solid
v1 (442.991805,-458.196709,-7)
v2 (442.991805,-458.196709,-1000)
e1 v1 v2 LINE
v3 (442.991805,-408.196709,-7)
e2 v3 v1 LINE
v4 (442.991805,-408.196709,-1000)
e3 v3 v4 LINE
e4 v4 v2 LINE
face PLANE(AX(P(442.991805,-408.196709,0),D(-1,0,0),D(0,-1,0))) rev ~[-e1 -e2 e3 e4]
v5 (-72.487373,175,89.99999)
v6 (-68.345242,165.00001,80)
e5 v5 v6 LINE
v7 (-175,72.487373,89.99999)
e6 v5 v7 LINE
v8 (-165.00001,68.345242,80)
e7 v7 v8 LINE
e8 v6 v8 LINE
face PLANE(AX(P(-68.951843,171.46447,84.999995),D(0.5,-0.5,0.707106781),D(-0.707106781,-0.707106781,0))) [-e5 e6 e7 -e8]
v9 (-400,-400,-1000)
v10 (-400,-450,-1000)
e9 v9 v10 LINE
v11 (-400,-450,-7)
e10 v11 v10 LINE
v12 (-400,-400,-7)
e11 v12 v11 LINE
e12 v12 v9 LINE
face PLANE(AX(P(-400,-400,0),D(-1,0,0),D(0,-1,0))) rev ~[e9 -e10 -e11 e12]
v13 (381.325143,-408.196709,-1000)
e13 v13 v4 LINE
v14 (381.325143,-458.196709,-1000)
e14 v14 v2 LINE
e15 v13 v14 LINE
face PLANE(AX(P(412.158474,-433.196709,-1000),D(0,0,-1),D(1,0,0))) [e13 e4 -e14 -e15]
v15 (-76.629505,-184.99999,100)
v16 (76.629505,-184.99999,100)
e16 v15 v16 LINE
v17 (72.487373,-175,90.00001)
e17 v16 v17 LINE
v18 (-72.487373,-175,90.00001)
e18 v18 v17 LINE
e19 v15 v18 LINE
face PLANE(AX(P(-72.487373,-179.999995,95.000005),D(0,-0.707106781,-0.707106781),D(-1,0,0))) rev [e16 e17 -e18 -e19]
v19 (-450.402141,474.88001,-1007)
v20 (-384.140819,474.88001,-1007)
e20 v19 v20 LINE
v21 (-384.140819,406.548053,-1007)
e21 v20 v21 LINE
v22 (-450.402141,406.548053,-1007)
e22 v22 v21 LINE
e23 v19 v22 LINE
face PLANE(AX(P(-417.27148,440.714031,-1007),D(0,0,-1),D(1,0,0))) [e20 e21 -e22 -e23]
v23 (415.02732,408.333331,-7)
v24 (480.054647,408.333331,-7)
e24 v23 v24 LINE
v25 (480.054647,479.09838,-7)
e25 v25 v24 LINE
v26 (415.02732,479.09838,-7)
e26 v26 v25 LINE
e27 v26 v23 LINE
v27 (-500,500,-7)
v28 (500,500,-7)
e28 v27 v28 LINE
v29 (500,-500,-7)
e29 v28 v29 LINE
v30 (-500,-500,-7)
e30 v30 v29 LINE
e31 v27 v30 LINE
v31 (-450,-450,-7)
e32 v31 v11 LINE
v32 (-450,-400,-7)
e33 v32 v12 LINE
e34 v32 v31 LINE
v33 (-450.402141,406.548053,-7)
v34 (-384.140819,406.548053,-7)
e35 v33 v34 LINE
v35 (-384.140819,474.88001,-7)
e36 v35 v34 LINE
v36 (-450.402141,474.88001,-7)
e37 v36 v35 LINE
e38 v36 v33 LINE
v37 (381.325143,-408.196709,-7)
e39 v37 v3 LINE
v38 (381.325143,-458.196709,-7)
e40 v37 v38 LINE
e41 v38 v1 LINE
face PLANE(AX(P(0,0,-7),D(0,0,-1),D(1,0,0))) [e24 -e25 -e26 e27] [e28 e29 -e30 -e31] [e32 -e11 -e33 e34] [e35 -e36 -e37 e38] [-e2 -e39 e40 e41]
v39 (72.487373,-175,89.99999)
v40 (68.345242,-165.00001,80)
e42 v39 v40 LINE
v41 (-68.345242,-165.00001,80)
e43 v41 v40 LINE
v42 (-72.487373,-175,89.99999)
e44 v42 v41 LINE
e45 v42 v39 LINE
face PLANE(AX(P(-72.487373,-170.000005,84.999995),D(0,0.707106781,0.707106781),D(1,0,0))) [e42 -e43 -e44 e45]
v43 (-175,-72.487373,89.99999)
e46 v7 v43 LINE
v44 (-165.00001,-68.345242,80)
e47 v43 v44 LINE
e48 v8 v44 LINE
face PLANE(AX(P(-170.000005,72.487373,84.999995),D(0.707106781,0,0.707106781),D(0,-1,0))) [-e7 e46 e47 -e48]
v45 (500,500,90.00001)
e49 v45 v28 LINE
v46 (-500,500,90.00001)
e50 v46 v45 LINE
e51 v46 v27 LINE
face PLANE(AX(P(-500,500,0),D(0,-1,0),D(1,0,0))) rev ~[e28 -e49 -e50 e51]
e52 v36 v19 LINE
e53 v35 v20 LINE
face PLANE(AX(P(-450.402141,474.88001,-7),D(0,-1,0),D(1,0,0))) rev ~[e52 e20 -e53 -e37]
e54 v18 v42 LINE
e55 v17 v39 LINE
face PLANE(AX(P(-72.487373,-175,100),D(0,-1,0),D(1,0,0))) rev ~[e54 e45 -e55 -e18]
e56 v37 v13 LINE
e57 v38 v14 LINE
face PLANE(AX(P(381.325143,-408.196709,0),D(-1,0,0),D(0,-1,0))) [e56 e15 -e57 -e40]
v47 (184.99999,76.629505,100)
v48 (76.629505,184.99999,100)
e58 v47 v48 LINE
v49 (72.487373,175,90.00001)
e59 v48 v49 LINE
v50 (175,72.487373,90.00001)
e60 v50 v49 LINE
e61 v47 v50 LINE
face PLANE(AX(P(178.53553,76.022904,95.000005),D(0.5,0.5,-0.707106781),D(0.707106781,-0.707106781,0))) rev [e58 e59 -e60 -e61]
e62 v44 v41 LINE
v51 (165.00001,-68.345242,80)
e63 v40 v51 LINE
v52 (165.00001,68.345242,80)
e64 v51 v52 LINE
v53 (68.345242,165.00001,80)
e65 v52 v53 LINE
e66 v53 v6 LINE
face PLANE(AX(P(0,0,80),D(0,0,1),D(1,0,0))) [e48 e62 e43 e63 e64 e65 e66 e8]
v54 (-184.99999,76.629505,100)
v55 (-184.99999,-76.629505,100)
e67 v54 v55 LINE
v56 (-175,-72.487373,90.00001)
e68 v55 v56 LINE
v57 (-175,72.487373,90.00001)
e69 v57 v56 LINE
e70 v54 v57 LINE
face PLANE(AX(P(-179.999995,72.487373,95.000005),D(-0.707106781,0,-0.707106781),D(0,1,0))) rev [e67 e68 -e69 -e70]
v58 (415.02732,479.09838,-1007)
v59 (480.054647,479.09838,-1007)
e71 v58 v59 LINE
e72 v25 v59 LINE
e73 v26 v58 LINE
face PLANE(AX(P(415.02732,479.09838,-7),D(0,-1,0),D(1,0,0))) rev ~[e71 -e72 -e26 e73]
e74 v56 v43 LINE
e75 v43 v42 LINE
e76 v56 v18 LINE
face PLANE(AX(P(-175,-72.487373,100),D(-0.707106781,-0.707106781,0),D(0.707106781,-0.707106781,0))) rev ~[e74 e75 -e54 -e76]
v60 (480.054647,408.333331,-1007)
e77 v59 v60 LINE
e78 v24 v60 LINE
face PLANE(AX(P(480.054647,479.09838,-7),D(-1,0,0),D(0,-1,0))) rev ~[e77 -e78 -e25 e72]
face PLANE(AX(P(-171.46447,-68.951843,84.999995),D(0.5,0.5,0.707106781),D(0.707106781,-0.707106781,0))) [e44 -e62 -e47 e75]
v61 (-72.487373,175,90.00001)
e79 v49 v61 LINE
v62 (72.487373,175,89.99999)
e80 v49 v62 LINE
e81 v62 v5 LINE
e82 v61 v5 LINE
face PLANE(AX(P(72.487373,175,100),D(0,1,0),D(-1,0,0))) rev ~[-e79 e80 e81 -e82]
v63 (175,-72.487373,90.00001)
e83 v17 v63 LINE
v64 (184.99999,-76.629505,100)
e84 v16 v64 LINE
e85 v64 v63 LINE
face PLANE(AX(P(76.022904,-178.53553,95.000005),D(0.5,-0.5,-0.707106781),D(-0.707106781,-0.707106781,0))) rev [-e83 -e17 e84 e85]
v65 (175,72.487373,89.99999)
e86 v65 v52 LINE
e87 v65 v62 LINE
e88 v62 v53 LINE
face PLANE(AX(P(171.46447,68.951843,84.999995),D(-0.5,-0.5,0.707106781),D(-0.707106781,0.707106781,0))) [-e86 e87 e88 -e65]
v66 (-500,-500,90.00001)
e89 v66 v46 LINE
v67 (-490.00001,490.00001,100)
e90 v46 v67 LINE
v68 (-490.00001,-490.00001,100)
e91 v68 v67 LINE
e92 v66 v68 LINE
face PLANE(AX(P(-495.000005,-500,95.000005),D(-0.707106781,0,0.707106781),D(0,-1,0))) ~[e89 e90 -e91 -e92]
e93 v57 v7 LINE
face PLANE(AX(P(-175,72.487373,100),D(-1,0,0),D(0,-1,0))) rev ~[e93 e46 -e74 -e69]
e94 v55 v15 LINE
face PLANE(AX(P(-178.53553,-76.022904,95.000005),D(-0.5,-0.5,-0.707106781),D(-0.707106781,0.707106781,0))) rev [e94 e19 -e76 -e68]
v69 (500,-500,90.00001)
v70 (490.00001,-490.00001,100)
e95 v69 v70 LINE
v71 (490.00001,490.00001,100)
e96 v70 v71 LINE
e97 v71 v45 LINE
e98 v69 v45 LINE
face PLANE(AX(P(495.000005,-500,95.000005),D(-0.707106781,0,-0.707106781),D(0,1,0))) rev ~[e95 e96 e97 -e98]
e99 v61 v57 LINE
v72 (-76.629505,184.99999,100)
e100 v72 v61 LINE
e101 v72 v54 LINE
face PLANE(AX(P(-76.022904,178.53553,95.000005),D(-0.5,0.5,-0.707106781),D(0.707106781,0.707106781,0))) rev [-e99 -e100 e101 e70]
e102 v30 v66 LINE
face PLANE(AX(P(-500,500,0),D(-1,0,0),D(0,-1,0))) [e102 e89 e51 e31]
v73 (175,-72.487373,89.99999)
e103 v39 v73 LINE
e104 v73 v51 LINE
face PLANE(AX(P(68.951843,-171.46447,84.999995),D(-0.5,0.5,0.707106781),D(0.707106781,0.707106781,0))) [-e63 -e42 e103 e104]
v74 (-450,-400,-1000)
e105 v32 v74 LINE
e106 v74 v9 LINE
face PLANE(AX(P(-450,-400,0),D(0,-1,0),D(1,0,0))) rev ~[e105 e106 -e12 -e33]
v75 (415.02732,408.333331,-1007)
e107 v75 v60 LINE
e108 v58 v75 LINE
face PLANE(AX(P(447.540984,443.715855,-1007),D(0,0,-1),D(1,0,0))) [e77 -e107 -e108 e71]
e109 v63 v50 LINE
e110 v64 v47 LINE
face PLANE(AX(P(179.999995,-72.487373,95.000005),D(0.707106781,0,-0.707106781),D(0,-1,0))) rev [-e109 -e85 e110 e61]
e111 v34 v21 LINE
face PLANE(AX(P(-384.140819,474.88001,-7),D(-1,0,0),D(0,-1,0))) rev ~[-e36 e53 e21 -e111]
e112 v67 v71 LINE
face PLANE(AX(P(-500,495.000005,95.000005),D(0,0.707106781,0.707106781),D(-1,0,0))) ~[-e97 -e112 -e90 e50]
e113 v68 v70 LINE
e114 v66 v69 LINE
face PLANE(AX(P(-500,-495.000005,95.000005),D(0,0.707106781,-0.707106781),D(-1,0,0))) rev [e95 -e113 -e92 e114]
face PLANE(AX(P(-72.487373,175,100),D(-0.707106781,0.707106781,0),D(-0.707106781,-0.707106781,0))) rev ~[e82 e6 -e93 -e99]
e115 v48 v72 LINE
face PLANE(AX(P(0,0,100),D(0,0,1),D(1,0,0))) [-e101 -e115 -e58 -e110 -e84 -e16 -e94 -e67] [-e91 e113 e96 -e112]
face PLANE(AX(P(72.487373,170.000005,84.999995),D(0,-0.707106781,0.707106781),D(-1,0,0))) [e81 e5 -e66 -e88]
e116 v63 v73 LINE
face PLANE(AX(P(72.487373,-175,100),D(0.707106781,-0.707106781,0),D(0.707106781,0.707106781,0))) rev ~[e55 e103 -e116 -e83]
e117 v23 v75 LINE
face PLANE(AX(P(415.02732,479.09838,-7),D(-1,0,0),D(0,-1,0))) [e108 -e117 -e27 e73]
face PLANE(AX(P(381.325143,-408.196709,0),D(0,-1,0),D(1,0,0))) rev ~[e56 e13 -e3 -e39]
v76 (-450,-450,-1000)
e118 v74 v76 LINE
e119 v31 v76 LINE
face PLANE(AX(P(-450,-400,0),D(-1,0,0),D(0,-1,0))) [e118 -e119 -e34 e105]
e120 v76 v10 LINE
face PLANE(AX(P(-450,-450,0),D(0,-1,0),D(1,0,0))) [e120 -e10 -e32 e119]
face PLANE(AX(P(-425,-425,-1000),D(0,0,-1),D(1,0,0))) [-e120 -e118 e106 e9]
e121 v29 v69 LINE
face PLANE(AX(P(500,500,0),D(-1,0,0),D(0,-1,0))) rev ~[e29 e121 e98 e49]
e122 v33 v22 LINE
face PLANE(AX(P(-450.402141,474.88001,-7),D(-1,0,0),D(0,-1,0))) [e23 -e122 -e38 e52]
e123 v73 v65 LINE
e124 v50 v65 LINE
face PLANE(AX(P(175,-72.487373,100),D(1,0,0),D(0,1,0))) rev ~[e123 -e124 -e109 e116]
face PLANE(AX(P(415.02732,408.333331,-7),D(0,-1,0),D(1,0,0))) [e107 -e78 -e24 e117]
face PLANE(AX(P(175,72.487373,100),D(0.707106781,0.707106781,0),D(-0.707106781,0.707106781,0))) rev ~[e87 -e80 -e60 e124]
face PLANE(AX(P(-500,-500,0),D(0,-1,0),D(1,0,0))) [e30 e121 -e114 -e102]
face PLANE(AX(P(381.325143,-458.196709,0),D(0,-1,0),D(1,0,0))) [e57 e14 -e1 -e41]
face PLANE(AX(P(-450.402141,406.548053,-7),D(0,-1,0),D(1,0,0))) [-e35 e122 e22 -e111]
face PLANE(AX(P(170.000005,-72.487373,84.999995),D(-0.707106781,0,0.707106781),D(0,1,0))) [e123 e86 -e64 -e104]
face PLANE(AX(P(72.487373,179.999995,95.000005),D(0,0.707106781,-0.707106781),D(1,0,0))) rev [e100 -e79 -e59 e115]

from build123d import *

# Parameters (mm, degrees)
F0_W      = 1000
F0_H      = 1000
F1_DEPTH  = 100
F3_DEPTH  = 20
F4_SIZE   = 9.99999
F5_W      = 50
F5_H      = 50
F6_DEPTH  = 1000
F7_W      = 61.6666623382
F7_H      = 50
F8_DEPTH  = 1000
F9_W      = 1000
F9_H      = 1000
F9_W_2    = 50
F9_H_2    = 50
F9_W_3    = 61.6666623382
F10_W     = 57.3770701885
F10_H     = 57.3770701885
F10_W_2   = 65.0272965431
F10_H_2   = 76.5027403831
F11_DEPTH = 7
F12_W     = 66.2613213062
F12_H     = 68.3319568634
F13_DEPTH = 1000
F14_W     = 65.0273263454
F14_H     = 70.7650482655
F15_DEPTH = 1000


# Not quite as in the source:
# - a fillet or chamfer is up to 0.001 mm smaller than in the source, because OpenCascade refuses the exact size


with BuildPart() as f1:
    # F0 (on Top) → F1 (new body)
    with BuildSketch(Plane.XY):
        Rectangle(F0_W, F0_H)
    extrude(amount=F1_DEPTH)

    # F2 (on face) → F3 (cut)
    with BuildSketch(Plane.XY.offset(100)):
        Polygon((72.4873734153, -175), (175, -72.4873734153), (175, 72.4873734153), (72.4873734153, 175), (-72.4873734153, 175), (-175, 72.4873734153), (-175, -72.4873734153), (-72.4873734153, -175), align=None)
    extrude(amount=-F3_DEPTH, mode=Mode.SUBTRACT)

    # F4 (size 10 in the source; OpenCascade refuses exactly that, so slightly less here)
    f4_edges = [f1.edges().sort_by_distance(p)[0] for p in [
        (123.743687, -123.743687, 80),
        (175, 0, 80),
        (123.743687, 123.743687, 80),
        (0, 175, 80),
        (-123.743687, 123.743687, 80),
        (-175, 0, 80),
        (-123.743687, -123.743687, 80),
        (0, -175, 80),
        (0, -500, 100),
        (-500, 0, 100),
        (500, 0, 100),
        (0, 500, 100),
        (123.743687, -123.743687, 100),
        (175, 0, 100),
        (123.743687, 123.743687, 100),
        (0, 175, 100),
        (-123.743687, 123.743687, 100),
        (-175, 0, 100),
        (-123.743687, -123.743687, 100),
        (0, -175, 100),
    ]]
    chamfer(f4_edges, length=F4_SIZE)

    # F5 (on face) → F6 (join)
    with BuildSketch(Plane(origin=(0, 0, 0), x_dir=(1, 0, 0), z_dir=(0, 0, -1))):
        with Locations((-425, 425)):
            Rectangle(F5_W, F5_H)
    extrude(amount=F6_DEPTH)

    # F7 (on face) → F8 (join)
    with BuildSketch(Plane(origin=(0, 0, 0), x_dir=(1, 0, 0), z_dir=(0, 0, -1))):
        with Locations((412.1584743261, 433.19670856)):
            Rectangle(F7_W, F7_H)
    extrude(amount=F8_DEPTH)

    # F9 (on face) + F10 (on face) → F11 (join)
    with BuildSketch(Plane(origin=(0, 0, 0), x_dir=(1, 0, 0), z_dir=(0, 0, -1))):
        Rectangle(F9_W, F9_H)
        with Locations((-425, 425)):
            Rectangle(F9_W_2, F9_H_2, mode=Mode.SUBTRACT)
        with Locations((412.1584743261, 433.19670856)):
            Rectangle(F9_W_3, F9_H_2, mode=Mode.SUBTRACT)
    with BuildSketch(Plane(origin=(0, 0, 0), x_dir=(1, 0, 0), z_dir=(0, 0, -1))):
        with Locations((-409.2896133661, -459.9726945162)):
            Rectangle(F10_W, F10_H)
        with Locations((434.1530203819, -438.9344155788)):
            Rectangle(F10_W_2, F10_H_2)
    extrude(amount=F11_DEPTH)

    # F12 (on face) → F13 (join)
    with BuildSketch(Plane(origin=(0, 0, -7), x_dir=(1, 0, 0), z_dir=(0, 0, -1))):
        with Locations((-417.2714799643, -440.7140314579)):
            Rectangle(F12_W, F12_H)
    extrude(amount=F13_DEPTH)

    # F14 (on face) → F15 (join)
    with BuildSketch(Plane(origin=(0, 0, -7), x_dir=(1, 0, 0), z_dir=(0, 0, -1))):
        with Locations((447.5409835577, -443.7158554792)):
            Rectangle(F14_W, F14_H)
    extrude(amount=F15_DEPTH)


solid = f1.part
